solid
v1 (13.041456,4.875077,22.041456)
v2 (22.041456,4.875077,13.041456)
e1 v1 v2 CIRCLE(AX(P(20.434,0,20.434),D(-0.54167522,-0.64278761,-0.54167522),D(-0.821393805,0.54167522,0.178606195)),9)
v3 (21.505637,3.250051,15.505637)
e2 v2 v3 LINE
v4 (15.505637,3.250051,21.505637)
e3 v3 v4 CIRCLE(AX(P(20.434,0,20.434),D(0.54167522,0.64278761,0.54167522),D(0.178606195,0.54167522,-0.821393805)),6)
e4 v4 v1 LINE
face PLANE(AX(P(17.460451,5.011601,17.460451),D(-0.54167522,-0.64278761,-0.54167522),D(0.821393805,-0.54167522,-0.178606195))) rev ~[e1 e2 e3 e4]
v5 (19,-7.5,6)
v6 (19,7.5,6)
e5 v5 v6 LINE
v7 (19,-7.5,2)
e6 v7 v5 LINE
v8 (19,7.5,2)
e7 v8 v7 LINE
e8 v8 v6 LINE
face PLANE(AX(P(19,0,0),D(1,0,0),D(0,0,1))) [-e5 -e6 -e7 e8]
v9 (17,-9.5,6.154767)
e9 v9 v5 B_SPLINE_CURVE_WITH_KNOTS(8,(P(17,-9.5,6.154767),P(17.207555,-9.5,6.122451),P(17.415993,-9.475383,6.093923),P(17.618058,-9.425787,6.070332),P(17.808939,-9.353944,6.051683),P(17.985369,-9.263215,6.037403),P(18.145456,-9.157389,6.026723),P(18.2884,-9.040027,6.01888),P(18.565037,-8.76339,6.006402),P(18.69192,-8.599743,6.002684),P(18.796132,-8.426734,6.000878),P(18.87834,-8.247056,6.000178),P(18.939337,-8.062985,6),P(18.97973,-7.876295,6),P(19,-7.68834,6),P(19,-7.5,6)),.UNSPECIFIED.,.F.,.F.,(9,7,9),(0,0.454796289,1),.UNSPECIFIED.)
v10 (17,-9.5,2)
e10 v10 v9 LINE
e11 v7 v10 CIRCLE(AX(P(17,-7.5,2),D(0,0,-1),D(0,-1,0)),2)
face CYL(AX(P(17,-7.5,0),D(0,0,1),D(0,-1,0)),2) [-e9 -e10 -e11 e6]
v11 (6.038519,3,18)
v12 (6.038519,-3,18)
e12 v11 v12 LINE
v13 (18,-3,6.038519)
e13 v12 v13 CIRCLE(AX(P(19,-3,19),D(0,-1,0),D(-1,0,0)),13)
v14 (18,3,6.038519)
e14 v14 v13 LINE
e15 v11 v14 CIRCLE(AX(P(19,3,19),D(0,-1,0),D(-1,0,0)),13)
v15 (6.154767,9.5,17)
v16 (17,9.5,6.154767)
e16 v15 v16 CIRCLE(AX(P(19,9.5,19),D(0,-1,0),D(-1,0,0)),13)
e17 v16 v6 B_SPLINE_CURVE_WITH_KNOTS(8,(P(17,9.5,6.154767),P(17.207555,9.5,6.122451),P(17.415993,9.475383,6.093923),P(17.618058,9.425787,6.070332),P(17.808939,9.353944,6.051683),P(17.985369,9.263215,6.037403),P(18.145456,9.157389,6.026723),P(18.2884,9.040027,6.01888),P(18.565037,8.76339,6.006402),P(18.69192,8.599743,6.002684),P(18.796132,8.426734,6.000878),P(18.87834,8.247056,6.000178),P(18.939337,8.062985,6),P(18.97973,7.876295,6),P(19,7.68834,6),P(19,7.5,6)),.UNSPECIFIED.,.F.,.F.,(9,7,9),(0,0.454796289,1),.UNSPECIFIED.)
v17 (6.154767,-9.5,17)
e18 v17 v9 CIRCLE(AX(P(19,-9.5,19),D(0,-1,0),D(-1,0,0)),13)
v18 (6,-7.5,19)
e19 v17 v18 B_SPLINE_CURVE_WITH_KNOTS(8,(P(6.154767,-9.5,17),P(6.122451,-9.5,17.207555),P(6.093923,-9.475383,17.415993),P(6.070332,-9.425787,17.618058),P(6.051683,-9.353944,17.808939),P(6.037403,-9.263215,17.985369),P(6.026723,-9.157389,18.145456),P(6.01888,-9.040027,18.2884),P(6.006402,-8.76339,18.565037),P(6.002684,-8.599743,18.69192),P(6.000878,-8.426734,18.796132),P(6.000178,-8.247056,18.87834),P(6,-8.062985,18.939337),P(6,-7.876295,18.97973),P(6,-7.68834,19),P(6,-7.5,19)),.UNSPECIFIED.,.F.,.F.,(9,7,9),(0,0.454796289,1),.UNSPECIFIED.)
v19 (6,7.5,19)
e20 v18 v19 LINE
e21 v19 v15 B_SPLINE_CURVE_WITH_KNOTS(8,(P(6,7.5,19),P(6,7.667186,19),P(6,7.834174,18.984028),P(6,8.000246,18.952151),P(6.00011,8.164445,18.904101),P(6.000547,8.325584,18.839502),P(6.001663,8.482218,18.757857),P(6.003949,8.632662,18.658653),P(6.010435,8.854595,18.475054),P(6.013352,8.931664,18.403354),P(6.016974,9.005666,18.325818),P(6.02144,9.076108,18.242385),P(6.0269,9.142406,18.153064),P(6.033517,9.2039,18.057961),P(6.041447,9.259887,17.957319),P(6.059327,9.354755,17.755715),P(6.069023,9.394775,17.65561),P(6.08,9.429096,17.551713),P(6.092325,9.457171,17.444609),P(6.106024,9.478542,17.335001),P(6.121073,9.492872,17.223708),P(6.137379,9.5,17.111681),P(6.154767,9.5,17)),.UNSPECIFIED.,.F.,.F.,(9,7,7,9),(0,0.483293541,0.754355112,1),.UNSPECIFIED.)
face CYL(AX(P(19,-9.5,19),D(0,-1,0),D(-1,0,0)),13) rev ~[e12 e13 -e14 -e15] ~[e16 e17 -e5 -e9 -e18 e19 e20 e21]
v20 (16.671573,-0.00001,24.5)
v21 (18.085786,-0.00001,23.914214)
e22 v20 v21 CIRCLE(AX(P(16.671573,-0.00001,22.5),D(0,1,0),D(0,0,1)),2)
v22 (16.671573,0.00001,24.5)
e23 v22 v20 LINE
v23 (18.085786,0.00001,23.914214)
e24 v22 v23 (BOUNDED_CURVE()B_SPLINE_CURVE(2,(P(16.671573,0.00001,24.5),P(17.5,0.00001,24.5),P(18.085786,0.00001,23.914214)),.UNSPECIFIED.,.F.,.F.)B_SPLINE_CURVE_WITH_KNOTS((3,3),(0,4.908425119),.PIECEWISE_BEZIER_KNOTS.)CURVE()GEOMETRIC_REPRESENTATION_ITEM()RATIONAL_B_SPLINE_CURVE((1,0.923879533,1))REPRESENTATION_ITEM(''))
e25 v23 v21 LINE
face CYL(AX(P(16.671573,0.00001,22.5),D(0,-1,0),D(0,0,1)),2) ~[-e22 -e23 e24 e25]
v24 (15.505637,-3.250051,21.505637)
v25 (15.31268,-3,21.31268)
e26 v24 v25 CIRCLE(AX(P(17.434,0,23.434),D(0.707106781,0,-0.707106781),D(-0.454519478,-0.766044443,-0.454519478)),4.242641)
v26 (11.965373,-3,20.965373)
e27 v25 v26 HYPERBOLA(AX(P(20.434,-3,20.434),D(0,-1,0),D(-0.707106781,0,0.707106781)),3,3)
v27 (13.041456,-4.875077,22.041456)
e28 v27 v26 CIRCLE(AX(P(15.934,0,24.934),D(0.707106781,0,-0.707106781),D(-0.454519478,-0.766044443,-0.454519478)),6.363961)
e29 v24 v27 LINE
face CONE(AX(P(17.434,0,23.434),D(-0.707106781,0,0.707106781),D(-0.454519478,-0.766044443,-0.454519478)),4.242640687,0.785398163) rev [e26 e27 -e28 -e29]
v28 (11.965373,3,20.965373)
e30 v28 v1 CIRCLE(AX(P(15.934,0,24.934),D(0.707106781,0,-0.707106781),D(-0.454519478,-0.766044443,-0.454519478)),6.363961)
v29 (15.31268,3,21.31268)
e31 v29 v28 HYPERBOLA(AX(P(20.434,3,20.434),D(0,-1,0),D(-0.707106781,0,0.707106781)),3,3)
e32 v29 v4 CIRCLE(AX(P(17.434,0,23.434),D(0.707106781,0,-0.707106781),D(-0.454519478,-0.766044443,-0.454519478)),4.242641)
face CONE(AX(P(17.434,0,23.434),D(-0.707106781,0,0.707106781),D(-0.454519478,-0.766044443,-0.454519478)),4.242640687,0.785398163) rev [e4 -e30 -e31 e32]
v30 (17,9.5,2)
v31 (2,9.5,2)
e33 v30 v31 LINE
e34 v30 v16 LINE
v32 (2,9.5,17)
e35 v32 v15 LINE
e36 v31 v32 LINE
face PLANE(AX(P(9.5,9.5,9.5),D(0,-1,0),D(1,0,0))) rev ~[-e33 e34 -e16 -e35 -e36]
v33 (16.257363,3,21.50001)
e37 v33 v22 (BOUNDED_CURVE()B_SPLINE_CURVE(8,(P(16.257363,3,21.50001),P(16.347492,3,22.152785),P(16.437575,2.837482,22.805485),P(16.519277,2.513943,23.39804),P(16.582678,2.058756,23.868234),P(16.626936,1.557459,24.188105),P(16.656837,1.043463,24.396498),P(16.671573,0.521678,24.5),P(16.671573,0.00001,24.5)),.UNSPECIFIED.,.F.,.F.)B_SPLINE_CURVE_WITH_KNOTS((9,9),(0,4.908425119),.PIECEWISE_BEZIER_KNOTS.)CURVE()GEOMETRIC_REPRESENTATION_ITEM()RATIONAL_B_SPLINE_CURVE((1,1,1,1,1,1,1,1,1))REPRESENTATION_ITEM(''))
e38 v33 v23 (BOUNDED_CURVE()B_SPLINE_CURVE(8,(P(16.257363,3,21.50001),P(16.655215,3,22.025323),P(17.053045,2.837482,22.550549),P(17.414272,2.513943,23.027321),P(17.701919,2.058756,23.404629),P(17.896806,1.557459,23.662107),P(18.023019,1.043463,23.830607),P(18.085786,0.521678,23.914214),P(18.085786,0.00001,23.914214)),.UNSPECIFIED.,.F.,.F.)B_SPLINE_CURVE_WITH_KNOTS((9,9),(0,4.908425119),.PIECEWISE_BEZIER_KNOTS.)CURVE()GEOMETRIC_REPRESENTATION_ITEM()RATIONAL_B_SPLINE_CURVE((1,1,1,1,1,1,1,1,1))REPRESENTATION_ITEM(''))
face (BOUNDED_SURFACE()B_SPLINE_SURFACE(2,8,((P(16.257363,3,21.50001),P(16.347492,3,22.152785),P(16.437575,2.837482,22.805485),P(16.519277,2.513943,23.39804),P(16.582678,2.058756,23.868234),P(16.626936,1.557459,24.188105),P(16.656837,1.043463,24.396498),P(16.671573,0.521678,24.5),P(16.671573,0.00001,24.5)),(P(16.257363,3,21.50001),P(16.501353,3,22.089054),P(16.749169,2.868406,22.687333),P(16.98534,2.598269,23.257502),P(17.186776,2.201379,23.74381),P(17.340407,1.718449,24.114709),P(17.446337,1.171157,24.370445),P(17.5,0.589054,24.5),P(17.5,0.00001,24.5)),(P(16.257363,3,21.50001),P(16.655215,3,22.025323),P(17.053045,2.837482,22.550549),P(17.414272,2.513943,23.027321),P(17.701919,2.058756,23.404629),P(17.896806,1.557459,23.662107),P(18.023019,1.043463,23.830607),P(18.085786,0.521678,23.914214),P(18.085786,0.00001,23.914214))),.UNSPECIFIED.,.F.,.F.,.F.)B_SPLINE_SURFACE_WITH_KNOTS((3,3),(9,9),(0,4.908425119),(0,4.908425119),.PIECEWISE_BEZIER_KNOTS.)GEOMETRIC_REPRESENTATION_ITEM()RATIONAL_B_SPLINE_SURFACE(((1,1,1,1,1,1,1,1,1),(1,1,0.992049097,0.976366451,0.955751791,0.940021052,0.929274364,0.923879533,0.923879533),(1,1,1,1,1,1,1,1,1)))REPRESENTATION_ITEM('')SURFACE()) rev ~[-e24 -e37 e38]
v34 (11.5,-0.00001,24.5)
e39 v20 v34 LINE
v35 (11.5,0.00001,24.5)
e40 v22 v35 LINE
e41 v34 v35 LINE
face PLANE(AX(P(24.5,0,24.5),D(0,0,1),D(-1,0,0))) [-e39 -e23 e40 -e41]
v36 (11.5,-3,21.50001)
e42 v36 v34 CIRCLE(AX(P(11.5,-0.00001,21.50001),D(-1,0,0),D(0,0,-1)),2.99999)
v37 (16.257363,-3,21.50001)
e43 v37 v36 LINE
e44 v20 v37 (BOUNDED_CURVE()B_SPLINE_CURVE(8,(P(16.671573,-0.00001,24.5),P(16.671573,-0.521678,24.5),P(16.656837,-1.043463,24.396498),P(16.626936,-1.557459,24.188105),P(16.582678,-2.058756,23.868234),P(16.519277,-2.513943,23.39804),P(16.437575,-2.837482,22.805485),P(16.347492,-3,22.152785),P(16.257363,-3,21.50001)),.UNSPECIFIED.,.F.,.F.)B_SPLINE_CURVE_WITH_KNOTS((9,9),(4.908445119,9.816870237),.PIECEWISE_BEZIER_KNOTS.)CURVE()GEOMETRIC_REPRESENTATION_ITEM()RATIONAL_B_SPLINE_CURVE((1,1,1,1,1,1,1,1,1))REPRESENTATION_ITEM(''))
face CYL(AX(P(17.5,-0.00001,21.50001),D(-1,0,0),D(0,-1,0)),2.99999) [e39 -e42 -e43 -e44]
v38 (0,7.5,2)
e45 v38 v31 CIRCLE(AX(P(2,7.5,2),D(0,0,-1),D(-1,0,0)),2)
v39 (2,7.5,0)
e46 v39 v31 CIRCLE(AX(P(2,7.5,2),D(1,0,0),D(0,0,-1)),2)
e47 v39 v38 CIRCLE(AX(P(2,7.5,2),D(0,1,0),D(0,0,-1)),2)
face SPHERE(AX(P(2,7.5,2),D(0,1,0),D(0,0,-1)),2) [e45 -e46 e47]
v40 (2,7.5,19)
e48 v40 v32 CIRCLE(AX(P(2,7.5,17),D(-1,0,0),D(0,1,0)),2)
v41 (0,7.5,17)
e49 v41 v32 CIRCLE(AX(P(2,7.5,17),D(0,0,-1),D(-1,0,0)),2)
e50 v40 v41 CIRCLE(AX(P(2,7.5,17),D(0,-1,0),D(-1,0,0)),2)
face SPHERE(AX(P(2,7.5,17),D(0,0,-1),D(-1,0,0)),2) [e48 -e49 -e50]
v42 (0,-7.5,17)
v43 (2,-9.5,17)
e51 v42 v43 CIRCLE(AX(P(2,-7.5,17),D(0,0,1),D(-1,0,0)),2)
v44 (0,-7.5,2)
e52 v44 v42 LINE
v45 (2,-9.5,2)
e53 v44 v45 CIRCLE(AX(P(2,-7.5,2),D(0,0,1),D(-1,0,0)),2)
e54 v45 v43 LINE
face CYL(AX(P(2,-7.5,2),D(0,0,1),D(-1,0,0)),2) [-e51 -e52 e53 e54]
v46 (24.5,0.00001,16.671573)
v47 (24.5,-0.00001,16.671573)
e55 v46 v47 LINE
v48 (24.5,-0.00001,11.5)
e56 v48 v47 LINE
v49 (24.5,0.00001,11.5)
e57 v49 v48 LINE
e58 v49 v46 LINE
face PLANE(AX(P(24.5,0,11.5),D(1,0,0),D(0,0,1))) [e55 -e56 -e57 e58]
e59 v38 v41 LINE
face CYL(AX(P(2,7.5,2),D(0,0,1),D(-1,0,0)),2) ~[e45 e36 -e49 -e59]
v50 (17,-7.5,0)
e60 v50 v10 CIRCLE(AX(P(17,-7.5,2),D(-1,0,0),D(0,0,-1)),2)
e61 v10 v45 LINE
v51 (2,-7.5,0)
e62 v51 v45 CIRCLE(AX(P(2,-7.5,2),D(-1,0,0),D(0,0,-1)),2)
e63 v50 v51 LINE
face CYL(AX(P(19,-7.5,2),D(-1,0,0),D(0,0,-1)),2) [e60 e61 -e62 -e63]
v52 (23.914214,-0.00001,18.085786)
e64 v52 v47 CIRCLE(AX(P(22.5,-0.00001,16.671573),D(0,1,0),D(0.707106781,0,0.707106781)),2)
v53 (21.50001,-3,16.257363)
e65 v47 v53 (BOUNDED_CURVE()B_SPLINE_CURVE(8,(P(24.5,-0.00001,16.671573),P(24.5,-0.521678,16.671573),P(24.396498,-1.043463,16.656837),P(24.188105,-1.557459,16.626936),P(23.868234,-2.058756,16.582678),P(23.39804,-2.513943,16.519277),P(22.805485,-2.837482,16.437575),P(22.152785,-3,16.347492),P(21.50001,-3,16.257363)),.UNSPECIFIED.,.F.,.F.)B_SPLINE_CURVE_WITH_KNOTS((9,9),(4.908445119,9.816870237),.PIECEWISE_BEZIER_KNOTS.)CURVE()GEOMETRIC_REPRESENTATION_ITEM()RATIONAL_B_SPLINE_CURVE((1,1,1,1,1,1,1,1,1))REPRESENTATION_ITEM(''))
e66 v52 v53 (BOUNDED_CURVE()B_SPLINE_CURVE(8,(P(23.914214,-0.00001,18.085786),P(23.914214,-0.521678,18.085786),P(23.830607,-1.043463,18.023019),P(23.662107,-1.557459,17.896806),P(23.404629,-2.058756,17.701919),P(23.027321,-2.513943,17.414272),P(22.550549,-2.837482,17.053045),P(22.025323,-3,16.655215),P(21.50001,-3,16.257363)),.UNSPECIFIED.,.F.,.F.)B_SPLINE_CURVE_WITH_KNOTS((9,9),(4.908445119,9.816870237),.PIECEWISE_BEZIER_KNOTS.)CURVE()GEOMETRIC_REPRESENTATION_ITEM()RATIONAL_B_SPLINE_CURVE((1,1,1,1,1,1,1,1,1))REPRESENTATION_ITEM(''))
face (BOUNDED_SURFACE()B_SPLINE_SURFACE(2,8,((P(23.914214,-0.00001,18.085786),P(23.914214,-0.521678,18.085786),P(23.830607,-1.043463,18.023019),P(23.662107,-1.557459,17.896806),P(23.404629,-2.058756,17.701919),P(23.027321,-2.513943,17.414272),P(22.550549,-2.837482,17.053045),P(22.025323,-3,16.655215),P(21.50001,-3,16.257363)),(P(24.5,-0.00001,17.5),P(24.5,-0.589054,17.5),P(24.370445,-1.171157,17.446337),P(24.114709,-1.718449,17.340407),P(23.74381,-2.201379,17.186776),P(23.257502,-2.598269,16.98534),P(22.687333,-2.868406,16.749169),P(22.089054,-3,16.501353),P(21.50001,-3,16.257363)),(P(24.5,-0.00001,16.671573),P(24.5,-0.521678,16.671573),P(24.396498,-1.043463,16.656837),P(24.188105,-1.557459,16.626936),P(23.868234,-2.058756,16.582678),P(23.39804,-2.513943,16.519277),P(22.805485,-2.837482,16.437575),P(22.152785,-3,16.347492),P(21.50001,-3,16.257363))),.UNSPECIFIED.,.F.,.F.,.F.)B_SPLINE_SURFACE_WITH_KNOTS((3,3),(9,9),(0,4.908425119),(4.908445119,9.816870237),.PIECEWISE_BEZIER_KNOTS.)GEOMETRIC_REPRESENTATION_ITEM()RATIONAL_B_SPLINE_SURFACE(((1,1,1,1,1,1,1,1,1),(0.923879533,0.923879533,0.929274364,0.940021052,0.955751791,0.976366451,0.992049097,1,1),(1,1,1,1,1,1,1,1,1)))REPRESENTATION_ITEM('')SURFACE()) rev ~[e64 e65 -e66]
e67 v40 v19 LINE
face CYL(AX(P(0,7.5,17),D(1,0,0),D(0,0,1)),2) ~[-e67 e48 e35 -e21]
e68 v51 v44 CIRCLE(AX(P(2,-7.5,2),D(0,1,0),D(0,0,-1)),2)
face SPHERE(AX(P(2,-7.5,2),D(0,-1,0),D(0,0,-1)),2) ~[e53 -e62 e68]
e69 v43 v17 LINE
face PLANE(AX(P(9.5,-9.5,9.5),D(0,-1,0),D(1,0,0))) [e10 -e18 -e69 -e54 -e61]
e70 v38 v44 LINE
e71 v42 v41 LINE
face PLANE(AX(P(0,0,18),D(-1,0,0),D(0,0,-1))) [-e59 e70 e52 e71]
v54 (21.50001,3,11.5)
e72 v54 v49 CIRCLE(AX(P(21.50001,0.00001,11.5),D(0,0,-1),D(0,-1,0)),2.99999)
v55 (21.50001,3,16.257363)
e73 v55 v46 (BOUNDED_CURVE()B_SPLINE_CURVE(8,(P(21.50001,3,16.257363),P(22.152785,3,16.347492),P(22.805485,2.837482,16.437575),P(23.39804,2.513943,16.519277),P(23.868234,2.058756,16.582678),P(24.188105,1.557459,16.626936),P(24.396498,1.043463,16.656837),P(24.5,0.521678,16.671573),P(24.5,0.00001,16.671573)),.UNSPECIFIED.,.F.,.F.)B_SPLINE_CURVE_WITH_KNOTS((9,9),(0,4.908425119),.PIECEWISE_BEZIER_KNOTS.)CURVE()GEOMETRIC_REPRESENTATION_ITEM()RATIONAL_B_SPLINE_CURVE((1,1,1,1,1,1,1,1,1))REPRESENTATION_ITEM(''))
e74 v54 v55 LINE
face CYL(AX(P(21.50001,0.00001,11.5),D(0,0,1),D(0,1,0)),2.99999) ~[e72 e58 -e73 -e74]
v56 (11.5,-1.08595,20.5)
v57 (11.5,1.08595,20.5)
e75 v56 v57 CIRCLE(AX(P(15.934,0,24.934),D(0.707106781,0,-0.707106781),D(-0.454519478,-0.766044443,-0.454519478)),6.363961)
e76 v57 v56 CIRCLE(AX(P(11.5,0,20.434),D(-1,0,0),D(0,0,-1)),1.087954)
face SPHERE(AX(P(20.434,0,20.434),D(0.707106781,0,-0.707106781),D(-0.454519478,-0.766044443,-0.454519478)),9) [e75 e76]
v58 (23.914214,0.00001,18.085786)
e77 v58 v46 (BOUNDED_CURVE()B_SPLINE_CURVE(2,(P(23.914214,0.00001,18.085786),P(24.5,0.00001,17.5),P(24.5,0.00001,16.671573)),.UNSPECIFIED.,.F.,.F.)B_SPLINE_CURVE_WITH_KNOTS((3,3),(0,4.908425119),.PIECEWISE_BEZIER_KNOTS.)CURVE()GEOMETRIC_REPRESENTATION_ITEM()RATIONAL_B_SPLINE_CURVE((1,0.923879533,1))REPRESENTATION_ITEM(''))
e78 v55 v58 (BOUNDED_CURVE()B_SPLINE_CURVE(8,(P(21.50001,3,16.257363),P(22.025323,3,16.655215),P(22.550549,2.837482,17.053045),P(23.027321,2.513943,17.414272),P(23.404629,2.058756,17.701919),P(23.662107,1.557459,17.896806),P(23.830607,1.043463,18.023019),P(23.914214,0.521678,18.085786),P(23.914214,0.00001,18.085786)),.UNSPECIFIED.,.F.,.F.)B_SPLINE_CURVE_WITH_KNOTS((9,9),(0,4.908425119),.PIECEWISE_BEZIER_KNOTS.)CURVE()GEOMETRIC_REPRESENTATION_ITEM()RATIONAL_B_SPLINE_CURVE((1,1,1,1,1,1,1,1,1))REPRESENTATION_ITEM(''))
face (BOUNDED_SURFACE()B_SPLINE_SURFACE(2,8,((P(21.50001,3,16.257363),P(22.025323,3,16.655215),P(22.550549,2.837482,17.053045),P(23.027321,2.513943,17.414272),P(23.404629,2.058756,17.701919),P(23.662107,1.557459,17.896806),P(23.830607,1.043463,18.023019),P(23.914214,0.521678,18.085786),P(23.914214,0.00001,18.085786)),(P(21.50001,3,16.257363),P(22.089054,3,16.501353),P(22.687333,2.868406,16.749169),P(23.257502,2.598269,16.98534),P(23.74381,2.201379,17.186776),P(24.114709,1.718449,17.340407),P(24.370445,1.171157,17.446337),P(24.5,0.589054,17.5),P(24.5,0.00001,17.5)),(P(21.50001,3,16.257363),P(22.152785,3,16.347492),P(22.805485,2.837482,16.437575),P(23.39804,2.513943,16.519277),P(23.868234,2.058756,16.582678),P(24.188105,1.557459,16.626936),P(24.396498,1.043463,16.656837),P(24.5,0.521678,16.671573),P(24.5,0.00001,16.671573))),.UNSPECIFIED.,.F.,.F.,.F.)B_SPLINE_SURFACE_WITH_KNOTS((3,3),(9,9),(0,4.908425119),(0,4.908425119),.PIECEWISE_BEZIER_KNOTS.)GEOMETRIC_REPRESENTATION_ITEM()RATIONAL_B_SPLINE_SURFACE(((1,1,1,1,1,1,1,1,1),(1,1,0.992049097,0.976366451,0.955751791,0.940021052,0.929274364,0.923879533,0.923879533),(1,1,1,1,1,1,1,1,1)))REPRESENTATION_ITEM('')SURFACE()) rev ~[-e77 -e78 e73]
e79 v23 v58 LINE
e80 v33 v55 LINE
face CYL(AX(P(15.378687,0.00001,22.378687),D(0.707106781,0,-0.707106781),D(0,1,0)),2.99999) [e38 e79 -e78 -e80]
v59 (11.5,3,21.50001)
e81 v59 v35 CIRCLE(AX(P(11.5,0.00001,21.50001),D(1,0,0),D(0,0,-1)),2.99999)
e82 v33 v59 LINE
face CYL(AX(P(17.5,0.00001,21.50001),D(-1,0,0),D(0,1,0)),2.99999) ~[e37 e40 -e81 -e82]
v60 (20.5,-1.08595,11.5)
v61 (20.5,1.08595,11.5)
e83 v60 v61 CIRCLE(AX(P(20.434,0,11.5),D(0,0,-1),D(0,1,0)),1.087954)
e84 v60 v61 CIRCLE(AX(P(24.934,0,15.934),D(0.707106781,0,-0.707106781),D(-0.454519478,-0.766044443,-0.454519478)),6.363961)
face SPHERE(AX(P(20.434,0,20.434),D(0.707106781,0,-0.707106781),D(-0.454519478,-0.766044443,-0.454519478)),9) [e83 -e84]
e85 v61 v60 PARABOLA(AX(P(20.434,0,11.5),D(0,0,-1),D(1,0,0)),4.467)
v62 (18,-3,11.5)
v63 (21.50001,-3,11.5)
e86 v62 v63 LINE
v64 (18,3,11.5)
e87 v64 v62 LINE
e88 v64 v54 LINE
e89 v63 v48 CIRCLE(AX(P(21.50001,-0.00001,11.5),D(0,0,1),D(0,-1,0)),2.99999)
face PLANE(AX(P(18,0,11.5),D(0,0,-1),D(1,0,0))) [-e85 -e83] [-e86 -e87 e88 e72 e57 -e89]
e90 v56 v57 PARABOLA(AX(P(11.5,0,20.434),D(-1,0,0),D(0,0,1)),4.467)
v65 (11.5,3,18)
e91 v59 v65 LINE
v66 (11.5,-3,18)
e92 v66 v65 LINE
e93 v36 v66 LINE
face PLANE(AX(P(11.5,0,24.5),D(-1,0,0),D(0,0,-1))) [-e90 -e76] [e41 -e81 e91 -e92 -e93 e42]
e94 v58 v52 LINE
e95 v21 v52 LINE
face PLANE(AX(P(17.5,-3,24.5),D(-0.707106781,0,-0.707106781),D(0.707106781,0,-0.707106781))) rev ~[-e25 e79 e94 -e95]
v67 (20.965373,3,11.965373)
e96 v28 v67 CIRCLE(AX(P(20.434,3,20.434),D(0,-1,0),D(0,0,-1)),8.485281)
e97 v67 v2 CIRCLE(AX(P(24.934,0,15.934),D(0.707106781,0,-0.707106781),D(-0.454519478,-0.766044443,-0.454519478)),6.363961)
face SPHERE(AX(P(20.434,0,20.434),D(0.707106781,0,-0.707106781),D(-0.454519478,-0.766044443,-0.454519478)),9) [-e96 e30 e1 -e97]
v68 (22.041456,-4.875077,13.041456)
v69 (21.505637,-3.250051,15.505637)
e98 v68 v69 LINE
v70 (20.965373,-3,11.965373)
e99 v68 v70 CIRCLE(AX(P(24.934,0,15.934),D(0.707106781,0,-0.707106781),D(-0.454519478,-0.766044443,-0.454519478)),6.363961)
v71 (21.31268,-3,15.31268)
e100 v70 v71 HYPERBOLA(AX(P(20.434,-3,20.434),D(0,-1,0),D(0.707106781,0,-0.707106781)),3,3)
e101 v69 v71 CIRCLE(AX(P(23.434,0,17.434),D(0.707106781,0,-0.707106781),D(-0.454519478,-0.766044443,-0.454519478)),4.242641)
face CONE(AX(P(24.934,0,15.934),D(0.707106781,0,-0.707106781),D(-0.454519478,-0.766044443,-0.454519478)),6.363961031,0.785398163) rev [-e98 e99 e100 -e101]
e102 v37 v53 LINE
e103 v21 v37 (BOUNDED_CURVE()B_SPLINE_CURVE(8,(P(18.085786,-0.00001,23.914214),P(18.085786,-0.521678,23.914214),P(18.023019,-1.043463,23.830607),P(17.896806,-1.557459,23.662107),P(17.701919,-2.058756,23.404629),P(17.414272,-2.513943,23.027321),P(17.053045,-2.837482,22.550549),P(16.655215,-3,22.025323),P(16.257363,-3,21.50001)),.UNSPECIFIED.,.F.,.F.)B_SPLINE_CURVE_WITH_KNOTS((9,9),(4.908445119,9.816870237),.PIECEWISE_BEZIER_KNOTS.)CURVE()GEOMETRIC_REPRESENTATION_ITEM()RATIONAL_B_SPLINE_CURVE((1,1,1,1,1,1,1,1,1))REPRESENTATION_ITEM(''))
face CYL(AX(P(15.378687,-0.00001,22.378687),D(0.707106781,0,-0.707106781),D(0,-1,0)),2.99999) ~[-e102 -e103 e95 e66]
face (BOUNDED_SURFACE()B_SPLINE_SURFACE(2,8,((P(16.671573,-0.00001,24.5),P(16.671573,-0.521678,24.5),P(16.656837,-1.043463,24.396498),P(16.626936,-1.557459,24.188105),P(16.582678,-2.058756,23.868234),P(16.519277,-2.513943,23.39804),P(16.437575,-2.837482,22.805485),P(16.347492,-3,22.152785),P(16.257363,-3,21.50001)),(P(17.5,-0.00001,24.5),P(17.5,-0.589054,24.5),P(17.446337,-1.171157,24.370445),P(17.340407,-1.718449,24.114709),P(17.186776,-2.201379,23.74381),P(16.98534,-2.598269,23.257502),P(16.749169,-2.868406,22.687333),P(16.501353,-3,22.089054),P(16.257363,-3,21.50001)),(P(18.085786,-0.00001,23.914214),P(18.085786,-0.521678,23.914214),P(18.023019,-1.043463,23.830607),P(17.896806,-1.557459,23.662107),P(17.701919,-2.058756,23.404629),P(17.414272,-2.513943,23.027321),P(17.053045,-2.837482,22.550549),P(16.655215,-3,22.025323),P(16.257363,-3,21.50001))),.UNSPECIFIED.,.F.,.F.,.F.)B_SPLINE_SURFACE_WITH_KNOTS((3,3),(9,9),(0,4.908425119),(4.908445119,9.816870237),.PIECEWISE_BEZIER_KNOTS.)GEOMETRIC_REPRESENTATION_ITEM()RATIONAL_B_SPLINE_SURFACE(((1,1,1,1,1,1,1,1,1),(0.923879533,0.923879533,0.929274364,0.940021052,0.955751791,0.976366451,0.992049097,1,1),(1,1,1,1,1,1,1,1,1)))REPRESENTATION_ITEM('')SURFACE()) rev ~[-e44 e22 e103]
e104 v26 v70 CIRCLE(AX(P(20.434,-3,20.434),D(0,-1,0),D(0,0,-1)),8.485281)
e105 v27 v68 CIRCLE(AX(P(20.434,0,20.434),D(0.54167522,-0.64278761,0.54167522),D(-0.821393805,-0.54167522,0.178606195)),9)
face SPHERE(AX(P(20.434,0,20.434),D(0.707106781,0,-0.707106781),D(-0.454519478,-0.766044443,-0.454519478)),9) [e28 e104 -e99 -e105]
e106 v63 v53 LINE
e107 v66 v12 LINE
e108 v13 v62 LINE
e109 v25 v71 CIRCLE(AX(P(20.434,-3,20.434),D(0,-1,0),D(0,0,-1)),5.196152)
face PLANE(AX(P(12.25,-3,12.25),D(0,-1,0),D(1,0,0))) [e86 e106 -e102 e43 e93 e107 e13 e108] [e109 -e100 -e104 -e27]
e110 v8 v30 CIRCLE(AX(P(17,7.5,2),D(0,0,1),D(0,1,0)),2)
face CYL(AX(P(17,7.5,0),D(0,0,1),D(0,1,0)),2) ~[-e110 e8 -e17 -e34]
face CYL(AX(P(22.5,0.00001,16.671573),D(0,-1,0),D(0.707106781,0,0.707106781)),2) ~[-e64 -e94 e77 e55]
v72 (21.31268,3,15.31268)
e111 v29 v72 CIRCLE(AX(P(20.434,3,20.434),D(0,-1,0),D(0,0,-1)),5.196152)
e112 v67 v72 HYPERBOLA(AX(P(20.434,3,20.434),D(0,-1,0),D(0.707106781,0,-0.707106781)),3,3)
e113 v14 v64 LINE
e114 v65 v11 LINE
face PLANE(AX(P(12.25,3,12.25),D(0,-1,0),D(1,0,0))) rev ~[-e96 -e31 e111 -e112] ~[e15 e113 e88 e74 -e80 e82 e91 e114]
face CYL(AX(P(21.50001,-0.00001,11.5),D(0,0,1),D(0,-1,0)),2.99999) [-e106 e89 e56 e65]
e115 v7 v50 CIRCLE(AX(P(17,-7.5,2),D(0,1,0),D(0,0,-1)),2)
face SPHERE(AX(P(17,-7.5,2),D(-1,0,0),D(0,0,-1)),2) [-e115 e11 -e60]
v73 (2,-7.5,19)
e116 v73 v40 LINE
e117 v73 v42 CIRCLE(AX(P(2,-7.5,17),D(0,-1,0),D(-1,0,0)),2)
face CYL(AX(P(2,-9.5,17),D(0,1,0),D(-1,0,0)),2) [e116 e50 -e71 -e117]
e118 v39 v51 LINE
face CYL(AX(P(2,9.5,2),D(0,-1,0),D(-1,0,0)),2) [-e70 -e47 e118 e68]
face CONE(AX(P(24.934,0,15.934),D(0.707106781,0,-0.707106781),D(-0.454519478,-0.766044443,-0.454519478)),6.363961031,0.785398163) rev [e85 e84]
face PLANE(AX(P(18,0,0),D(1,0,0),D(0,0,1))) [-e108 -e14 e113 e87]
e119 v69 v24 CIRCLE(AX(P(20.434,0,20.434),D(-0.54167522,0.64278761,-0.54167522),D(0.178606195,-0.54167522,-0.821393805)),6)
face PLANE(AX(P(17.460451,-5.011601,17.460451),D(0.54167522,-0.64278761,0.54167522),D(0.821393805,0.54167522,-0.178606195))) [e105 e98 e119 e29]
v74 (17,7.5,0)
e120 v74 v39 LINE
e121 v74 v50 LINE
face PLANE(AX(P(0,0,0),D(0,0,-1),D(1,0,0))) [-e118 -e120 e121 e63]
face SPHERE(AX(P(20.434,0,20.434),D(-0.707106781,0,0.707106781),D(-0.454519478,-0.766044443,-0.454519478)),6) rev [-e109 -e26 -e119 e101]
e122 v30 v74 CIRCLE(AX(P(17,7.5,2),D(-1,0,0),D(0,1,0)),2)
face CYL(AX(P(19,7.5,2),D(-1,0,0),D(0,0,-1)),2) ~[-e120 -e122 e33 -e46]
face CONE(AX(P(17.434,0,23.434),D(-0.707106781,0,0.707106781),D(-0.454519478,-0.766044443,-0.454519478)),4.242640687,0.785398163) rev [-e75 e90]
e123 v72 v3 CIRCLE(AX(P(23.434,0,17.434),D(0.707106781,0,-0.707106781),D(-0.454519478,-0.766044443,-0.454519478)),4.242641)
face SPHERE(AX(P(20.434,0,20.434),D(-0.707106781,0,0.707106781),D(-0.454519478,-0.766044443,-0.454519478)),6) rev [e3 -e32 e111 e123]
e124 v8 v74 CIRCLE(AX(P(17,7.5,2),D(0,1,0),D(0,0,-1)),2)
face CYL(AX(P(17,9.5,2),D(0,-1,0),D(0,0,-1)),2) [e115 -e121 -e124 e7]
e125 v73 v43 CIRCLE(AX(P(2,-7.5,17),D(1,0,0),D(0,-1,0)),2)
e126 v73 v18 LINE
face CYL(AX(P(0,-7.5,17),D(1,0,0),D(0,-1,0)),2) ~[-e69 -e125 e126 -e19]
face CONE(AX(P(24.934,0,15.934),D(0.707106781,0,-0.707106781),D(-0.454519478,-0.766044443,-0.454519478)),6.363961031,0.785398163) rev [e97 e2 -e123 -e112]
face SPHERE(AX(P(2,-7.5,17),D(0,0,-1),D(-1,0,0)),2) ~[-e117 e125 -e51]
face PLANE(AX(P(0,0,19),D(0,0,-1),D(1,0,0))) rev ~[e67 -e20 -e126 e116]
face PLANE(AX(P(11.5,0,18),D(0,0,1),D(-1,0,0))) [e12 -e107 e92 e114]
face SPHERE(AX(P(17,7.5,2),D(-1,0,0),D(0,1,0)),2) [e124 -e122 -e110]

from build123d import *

# Parameters (mm, degrees)
F0_W           = 19
F0_H           = 19
F1_DEPTH       = 9.5
F3_DEPTH       = 19.001
F5_DEPTH       = 3
F6_R           = 2
F8_DEPTH       = 12.501
F9_R           = 2
F10_R          = 2.99999
F11_R          = 2
F13_ANGLE_BACK = 50
F13_ANGLE      = 100


# Not quite as in the source:
# - a fillet or chamfer is up to 0.001 mm smaller than in the source, because OpenCascade refuses the exact size


with BuildPart() as f1:
    # F0 (on Front) → F1 (new body, symmetric)
    with BuildSketch(Plane.XZ):
        with Locations((9.5, 9.5)):
            Rectangle(F0_W, F0_H)
    extrude(amount=F1_DEPTH, both=True)

    # F2 (on face) → F3 (cut, through all)
    with BuildSketch(Plane.XZ.offset(9.5)):
        with BuildLine():
            ThreePointArc((6, 19), (9.8076118446, 9.8076118446), (19, 6))
            Line((19, 6), (19, 19))
            Line((19, 19), (6, 19))
        make_face()
    extrude(amount=-F3_DEPTH, mode=Mode.SUBTRACT)

    # F4 (on Front) → F5 (join, symmetric)
    with BuildSketch(Plane.XZ):
        Polygon((0, 18), (0, 0), (18, 0), (18, 11.5), (24.5, 11.5), (24.5, 24.5), (11.5, 24.5), (11.5, 18), align=None)
    extrude(amount=F5_DEPTH, both=True)

    # F6
    f6_edges = [f1.edges().sort_by_distance(p)[0] for p in [
        (0, 0, 0),
    ]]
    fillet(f6_edges, radius=F6_R)

    # F7 (on face) → F8 (cut, through all)
    with BuildSketch(Plane.XZ.offset(3)):
        Polygon((17.5, 24.5), (24.5, 17.5), (24.5, 24.5), align=None)
    extrude(amount=-F8_DEPTH, mode=Mode.SUBTRACT)

    # F9
    f9_edges = [f1.edges().sort_by_distance(p)[0] for p in [
        (0, -9.5, 10.5),
        (0, 9.5, 10.5),
        (0, 0, 19),
        (3, 9.5, 19),
        (3, -9.5, 19),
        (19, 9.5, 3),
        (19, 0, 0),
        (19, -9.5, 3),
    ]]
    fillet(f9_edges, radius=F9_R)

    # F10 (radius 3 in the source; OpenCascade refuses exactly that, so slightly less here)
    f10_edges = [f1.edges().sort_by_distance(p)[0] for p in [
        (14.5, -3, 24.5),
        (21, -3, 21),
        (24.5, -3, 14.5),
        (14.5, 3, 24.5),
        (21, 3, 21),
        (24.5, 3, 14.5),
    ]]
    fillet(f10_edges, radius=F10_R)

    # F11
    f11_edges = [f1.edges().sort_by_distance(p)[0] for p in [
        (17.118519, 2.162797, 23.579023),
        (23.579023, 2.162797, 17.118519),
    ]]
    fillet(f11_edges, radius=F11_R)

    # F12 (on Front) → F13 (revolve)
    with BuildSketch(Plane.XZ, mode=Mode.PRIVATE) as f13_sk:
        with BuildLine():
            Line((14.434, 20.434), (11.434, 20.434))
            ThreePointArc((11.434, 20.434), (14.0700389693, 14.0700389693), (20.434, 11.434))
            Line((20.434, 11.434), (20.434, 14.434))
            ThreePointArc((20.434, 14.434), (16.1913593129, 16.1913593129), (14.434, 20.434))
        make_face()
    revolve(f13_sk.sketch.rotate(Axis((20.434, 0, 20.434), (0.7071067812, 0, -0.7071067812)), -F13_ANGLE_BACK), axis=Axis((20.434, 0, 20.434), (0.7071067812, 0, -0.7071067812)), revolution_arc=F13_ANGLE)


solid = f1.part
